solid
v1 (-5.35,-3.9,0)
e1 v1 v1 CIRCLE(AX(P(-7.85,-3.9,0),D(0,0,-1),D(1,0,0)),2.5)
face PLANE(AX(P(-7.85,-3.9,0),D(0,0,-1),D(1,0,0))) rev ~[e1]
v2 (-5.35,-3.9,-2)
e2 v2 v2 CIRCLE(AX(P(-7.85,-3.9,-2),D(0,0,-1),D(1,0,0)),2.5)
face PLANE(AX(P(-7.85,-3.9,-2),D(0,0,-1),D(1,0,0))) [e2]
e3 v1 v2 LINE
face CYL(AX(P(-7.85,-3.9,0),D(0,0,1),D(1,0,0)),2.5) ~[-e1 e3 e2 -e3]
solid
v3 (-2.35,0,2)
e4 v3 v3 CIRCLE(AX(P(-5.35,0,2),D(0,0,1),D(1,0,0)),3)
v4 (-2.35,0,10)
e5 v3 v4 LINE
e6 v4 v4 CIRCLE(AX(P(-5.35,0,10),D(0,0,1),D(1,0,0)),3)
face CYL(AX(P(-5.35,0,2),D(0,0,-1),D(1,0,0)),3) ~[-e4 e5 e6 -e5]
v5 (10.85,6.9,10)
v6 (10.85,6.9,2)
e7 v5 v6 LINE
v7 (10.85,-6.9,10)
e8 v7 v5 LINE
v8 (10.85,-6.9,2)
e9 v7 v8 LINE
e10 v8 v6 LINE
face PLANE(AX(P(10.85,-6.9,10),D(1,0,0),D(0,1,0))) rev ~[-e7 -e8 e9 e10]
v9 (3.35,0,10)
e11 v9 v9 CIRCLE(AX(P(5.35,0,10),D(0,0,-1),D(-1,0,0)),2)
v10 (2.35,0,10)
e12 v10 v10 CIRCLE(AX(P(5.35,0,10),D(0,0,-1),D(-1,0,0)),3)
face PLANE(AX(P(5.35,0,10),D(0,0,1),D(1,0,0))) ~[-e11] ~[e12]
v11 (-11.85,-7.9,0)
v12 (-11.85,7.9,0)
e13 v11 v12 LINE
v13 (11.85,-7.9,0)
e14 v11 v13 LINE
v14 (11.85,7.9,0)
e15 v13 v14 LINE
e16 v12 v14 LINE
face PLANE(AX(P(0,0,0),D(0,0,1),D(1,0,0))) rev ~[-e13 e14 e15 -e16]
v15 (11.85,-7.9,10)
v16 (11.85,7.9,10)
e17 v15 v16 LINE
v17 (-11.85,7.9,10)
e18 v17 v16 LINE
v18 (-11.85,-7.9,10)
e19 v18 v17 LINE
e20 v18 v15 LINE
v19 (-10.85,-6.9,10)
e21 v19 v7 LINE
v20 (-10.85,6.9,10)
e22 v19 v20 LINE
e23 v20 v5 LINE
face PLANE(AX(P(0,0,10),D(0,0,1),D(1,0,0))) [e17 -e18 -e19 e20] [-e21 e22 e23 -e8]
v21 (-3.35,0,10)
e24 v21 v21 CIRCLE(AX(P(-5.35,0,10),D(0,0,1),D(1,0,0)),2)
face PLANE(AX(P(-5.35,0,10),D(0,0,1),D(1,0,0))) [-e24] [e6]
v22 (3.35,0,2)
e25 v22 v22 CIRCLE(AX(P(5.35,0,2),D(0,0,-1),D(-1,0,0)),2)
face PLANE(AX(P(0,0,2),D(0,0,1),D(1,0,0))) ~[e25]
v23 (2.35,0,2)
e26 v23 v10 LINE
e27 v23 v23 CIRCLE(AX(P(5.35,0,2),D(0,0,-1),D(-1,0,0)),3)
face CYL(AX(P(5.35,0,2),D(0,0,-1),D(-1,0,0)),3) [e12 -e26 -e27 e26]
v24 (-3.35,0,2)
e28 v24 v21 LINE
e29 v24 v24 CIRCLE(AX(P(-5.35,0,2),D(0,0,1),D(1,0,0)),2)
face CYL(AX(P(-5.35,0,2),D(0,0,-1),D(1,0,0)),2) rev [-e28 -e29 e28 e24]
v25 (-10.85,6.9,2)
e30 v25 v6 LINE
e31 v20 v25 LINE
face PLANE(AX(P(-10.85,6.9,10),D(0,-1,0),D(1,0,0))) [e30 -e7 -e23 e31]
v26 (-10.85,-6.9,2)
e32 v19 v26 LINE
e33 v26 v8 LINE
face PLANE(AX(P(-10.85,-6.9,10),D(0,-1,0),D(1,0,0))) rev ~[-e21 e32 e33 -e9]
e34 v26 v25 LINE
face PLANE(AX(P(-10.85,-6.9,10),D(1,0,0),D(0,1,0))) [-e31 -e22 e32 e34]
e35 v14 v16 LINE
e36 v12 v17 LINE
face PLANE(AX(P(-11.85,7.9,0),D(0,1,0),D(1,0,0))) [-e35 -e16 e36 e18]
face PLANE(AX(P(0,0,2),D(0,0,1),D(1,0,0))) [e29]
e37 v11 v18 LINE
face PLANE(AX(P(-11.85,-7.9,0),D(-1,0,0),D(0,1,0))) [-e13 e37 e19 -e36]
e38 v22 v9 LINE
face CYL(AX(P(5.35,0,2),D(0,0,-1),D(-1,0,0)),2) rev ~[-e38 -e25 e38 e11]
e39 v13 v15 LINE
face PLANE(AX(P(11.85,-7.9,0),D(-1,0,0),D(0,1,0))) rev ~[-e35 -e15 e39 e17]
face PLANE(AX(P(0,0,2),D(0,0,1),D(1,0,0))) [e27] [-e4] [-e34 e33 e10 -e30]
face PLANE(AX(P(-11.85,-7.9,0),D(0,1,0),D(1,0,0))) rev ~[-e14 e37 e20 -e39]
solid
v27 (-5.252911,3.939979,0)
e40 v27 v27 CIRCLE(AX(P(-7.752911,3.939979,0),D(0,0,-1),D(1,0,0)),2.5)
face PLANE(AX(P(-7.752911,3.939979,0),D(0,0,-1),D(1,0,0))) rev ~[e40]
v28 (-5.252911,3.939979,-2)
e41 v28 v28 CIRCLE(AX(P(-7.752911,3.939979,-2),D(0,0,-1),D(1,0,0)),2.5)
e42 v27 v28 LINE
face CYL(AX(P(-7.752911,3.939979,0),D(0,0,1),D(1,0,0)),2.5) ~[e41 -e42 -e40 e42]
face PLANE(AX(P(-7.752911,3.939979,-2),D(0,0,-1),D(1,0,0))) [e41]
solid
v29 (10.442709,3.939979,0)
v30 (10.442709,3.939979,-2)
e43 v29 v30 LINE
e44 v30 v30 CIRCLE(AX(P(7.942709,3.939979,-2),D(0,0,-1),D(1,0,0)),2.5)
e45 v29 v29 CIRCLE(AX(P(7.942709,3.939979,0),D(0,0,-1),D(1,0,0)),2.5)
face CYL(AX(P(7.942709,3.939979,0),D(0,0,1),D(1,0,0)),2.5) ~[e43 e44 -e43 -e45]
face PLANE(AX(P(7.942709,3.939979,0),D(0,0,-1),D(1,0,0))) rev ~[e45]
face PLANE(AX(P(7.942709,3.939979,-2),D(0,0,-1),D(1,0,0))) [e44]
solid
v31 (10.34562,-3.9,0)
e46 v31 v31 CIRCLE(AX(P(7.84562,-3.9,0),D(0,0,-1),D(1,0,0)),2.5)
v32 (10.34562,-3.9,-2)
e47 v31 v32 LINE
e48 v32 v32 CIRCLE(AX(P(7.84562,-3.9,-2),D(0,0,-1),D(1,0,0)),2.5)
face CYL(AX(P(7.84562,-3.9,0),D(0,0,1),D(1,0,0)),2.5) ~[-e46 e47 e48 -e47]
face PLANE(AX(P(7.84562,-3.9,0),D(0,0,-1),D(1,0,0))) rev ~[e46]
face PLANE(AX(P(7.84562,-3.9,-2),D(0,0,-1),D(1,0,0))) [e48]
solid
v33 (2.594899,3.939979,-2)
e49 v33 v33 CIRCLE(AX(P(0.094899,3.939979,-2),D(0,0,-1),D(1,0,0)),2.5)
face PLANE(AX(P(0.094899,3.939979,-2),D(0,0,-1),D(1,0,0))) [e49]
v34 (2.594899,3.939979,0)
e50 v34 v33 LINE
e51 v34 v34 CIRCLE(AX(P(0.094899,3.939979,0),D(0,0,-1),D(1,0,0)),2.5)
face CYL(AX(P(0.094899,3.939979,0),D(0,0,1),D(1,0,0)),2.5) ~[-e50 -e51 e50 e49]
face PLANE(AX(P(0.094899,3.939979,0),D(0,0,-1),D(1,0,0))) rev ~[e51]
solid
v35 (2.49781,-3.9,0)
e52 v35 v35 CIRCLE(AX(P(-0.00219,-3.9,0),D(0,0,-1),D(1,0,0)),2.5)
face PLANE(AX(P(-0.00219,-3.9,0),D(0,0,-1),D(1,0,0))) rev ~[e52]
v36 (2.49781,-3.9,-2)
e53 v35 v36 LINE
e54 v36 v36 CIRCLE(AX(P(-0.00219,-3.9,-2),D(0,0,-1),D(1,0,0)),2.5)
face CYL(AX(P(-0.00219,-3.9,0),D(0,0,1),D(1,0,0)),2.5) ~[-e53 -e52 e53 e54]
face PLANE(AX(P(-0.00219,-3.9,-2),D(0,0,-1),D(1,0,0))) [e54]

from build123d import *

# Parameters (mm, degrees)
F0_W      = 23.7
F0_H      = 15.8
F1_DEPTH  = 10
F9_W      = 21.7
F9_H      = 13.8
F10_DEPTH = 8
F11_R     = 3
F11_R_2   = 2
F12_DEPTH = 8
F15_R     = 2.5
F16_DEPTH = 2


# Not quite as in the source:
# - the program builds the solid bodies; features that only make, move or delete a surface that nothing else refers to are left out


with BuildPart() as f1:
    # F0 (on Top) → F1 (new body)
    with BuildSketch(Plane.XY):
        Rectangle(F0_W, F0_H)
    extrude(amount=F1_DEPTH)

    # F9 (on face) → F10 (cut)
    with BuildSketch(Plane.XY.offset(10)):
        Rectangle(F9_W, F9_H)
    extrude(amount=-F10_DEPTH, mode=Mode.SUBTRACT)

    # F11 (on face) → F12 (join, through all)
    with BuildSketch(Plane.XY.offset(2)):
        with Locations((-5.35, 0)):
            Circle(F11_R)
        with Locations((-5.35, 0)):
            Circle(F11_R_2, mode=Mode.SUBTRACT)
    extrude(amount=F12_DEPTH)

    # F13: F1 across plane


with BuildPart() as f1_1:
    add(f1.part)
    add(f1.part.mirror(Plane.YZ))


with BuildPart() as f16:
    # F15 (on face) → F16 (new body)
    with BuildSketch(Plane(origin=(0, 0, 0), x_dir=(1, 0, 0), z_dir=(0, 0, -1))):
        with Locations((-7.752910628, -3.9399788514)):
            Circle(F15_R)
    extrude(amount=F16_DEPTH)


with BuildPart() as f16b:
    # F15 (on face) → F16, piece 2 (new body)
    with BuildSketch(Plane(origin=(0, 0, 0), x_dir=(1, 0, 0), z_dir=(0, 0, -1))):
        with Locations((-7.85, 3.9)):
            Circle(F15_R)
    extrude(amount=F16_DEPTH)


with BuildPart() as f16c:
    # F15 (on face) → F16, piece 3 (new body)
    with BuildSketch(Plane(origin=(0, 0, 0), x_dir=(1, 0, 0), z_dir=(0, 0, -1))):
        with Locations((-0.00219, 3.9)):
            Circle(F15_R)
    extrude(amount=F16_DEPTH)


with BuildPart() as f16d:
    # F15 (on face) → F16, piece 4 (new body)
    with BuildSketch(Plane(origin=(0, 0, 0), x_dir=(1, 0, 0), z_dir=(0, 0, -1))):
        with Locations((7.84562, 3.9)):
            Circle(F15_R)
    extrude(amount=F16_DEPTH)


with BuildPart() as f16e:
    # F15 (on face) → F16, piece 5 (new body)
    with BuildSketch(Plane(origin=(0, 0, 0), x_dir=(1, 0, 0), z_dir=(0, 0, -1))):
        with Locations((7.942709372, -3.9399788514)):
            Circle(F15_R)
    extrude(amount=F16_DEPTH)


with BuildPart() as f16f:
    # F15 (on face) → F16, piece 6 (new body)
    with BuildSketch(Plane(origin=(0, 0, 0), x_dir=(1, 0, 0), z_dir=(0, 0, -1))):
        with Locations((0.094899372, -3.9399788514)):
            Circle(F15_R)
    extrude(amount=F16_DEPTH)


solid = Compound([f1_1.part, f16.part, f16b.part, f16c.part, f16d.part, f16e.part, f16f.part])
